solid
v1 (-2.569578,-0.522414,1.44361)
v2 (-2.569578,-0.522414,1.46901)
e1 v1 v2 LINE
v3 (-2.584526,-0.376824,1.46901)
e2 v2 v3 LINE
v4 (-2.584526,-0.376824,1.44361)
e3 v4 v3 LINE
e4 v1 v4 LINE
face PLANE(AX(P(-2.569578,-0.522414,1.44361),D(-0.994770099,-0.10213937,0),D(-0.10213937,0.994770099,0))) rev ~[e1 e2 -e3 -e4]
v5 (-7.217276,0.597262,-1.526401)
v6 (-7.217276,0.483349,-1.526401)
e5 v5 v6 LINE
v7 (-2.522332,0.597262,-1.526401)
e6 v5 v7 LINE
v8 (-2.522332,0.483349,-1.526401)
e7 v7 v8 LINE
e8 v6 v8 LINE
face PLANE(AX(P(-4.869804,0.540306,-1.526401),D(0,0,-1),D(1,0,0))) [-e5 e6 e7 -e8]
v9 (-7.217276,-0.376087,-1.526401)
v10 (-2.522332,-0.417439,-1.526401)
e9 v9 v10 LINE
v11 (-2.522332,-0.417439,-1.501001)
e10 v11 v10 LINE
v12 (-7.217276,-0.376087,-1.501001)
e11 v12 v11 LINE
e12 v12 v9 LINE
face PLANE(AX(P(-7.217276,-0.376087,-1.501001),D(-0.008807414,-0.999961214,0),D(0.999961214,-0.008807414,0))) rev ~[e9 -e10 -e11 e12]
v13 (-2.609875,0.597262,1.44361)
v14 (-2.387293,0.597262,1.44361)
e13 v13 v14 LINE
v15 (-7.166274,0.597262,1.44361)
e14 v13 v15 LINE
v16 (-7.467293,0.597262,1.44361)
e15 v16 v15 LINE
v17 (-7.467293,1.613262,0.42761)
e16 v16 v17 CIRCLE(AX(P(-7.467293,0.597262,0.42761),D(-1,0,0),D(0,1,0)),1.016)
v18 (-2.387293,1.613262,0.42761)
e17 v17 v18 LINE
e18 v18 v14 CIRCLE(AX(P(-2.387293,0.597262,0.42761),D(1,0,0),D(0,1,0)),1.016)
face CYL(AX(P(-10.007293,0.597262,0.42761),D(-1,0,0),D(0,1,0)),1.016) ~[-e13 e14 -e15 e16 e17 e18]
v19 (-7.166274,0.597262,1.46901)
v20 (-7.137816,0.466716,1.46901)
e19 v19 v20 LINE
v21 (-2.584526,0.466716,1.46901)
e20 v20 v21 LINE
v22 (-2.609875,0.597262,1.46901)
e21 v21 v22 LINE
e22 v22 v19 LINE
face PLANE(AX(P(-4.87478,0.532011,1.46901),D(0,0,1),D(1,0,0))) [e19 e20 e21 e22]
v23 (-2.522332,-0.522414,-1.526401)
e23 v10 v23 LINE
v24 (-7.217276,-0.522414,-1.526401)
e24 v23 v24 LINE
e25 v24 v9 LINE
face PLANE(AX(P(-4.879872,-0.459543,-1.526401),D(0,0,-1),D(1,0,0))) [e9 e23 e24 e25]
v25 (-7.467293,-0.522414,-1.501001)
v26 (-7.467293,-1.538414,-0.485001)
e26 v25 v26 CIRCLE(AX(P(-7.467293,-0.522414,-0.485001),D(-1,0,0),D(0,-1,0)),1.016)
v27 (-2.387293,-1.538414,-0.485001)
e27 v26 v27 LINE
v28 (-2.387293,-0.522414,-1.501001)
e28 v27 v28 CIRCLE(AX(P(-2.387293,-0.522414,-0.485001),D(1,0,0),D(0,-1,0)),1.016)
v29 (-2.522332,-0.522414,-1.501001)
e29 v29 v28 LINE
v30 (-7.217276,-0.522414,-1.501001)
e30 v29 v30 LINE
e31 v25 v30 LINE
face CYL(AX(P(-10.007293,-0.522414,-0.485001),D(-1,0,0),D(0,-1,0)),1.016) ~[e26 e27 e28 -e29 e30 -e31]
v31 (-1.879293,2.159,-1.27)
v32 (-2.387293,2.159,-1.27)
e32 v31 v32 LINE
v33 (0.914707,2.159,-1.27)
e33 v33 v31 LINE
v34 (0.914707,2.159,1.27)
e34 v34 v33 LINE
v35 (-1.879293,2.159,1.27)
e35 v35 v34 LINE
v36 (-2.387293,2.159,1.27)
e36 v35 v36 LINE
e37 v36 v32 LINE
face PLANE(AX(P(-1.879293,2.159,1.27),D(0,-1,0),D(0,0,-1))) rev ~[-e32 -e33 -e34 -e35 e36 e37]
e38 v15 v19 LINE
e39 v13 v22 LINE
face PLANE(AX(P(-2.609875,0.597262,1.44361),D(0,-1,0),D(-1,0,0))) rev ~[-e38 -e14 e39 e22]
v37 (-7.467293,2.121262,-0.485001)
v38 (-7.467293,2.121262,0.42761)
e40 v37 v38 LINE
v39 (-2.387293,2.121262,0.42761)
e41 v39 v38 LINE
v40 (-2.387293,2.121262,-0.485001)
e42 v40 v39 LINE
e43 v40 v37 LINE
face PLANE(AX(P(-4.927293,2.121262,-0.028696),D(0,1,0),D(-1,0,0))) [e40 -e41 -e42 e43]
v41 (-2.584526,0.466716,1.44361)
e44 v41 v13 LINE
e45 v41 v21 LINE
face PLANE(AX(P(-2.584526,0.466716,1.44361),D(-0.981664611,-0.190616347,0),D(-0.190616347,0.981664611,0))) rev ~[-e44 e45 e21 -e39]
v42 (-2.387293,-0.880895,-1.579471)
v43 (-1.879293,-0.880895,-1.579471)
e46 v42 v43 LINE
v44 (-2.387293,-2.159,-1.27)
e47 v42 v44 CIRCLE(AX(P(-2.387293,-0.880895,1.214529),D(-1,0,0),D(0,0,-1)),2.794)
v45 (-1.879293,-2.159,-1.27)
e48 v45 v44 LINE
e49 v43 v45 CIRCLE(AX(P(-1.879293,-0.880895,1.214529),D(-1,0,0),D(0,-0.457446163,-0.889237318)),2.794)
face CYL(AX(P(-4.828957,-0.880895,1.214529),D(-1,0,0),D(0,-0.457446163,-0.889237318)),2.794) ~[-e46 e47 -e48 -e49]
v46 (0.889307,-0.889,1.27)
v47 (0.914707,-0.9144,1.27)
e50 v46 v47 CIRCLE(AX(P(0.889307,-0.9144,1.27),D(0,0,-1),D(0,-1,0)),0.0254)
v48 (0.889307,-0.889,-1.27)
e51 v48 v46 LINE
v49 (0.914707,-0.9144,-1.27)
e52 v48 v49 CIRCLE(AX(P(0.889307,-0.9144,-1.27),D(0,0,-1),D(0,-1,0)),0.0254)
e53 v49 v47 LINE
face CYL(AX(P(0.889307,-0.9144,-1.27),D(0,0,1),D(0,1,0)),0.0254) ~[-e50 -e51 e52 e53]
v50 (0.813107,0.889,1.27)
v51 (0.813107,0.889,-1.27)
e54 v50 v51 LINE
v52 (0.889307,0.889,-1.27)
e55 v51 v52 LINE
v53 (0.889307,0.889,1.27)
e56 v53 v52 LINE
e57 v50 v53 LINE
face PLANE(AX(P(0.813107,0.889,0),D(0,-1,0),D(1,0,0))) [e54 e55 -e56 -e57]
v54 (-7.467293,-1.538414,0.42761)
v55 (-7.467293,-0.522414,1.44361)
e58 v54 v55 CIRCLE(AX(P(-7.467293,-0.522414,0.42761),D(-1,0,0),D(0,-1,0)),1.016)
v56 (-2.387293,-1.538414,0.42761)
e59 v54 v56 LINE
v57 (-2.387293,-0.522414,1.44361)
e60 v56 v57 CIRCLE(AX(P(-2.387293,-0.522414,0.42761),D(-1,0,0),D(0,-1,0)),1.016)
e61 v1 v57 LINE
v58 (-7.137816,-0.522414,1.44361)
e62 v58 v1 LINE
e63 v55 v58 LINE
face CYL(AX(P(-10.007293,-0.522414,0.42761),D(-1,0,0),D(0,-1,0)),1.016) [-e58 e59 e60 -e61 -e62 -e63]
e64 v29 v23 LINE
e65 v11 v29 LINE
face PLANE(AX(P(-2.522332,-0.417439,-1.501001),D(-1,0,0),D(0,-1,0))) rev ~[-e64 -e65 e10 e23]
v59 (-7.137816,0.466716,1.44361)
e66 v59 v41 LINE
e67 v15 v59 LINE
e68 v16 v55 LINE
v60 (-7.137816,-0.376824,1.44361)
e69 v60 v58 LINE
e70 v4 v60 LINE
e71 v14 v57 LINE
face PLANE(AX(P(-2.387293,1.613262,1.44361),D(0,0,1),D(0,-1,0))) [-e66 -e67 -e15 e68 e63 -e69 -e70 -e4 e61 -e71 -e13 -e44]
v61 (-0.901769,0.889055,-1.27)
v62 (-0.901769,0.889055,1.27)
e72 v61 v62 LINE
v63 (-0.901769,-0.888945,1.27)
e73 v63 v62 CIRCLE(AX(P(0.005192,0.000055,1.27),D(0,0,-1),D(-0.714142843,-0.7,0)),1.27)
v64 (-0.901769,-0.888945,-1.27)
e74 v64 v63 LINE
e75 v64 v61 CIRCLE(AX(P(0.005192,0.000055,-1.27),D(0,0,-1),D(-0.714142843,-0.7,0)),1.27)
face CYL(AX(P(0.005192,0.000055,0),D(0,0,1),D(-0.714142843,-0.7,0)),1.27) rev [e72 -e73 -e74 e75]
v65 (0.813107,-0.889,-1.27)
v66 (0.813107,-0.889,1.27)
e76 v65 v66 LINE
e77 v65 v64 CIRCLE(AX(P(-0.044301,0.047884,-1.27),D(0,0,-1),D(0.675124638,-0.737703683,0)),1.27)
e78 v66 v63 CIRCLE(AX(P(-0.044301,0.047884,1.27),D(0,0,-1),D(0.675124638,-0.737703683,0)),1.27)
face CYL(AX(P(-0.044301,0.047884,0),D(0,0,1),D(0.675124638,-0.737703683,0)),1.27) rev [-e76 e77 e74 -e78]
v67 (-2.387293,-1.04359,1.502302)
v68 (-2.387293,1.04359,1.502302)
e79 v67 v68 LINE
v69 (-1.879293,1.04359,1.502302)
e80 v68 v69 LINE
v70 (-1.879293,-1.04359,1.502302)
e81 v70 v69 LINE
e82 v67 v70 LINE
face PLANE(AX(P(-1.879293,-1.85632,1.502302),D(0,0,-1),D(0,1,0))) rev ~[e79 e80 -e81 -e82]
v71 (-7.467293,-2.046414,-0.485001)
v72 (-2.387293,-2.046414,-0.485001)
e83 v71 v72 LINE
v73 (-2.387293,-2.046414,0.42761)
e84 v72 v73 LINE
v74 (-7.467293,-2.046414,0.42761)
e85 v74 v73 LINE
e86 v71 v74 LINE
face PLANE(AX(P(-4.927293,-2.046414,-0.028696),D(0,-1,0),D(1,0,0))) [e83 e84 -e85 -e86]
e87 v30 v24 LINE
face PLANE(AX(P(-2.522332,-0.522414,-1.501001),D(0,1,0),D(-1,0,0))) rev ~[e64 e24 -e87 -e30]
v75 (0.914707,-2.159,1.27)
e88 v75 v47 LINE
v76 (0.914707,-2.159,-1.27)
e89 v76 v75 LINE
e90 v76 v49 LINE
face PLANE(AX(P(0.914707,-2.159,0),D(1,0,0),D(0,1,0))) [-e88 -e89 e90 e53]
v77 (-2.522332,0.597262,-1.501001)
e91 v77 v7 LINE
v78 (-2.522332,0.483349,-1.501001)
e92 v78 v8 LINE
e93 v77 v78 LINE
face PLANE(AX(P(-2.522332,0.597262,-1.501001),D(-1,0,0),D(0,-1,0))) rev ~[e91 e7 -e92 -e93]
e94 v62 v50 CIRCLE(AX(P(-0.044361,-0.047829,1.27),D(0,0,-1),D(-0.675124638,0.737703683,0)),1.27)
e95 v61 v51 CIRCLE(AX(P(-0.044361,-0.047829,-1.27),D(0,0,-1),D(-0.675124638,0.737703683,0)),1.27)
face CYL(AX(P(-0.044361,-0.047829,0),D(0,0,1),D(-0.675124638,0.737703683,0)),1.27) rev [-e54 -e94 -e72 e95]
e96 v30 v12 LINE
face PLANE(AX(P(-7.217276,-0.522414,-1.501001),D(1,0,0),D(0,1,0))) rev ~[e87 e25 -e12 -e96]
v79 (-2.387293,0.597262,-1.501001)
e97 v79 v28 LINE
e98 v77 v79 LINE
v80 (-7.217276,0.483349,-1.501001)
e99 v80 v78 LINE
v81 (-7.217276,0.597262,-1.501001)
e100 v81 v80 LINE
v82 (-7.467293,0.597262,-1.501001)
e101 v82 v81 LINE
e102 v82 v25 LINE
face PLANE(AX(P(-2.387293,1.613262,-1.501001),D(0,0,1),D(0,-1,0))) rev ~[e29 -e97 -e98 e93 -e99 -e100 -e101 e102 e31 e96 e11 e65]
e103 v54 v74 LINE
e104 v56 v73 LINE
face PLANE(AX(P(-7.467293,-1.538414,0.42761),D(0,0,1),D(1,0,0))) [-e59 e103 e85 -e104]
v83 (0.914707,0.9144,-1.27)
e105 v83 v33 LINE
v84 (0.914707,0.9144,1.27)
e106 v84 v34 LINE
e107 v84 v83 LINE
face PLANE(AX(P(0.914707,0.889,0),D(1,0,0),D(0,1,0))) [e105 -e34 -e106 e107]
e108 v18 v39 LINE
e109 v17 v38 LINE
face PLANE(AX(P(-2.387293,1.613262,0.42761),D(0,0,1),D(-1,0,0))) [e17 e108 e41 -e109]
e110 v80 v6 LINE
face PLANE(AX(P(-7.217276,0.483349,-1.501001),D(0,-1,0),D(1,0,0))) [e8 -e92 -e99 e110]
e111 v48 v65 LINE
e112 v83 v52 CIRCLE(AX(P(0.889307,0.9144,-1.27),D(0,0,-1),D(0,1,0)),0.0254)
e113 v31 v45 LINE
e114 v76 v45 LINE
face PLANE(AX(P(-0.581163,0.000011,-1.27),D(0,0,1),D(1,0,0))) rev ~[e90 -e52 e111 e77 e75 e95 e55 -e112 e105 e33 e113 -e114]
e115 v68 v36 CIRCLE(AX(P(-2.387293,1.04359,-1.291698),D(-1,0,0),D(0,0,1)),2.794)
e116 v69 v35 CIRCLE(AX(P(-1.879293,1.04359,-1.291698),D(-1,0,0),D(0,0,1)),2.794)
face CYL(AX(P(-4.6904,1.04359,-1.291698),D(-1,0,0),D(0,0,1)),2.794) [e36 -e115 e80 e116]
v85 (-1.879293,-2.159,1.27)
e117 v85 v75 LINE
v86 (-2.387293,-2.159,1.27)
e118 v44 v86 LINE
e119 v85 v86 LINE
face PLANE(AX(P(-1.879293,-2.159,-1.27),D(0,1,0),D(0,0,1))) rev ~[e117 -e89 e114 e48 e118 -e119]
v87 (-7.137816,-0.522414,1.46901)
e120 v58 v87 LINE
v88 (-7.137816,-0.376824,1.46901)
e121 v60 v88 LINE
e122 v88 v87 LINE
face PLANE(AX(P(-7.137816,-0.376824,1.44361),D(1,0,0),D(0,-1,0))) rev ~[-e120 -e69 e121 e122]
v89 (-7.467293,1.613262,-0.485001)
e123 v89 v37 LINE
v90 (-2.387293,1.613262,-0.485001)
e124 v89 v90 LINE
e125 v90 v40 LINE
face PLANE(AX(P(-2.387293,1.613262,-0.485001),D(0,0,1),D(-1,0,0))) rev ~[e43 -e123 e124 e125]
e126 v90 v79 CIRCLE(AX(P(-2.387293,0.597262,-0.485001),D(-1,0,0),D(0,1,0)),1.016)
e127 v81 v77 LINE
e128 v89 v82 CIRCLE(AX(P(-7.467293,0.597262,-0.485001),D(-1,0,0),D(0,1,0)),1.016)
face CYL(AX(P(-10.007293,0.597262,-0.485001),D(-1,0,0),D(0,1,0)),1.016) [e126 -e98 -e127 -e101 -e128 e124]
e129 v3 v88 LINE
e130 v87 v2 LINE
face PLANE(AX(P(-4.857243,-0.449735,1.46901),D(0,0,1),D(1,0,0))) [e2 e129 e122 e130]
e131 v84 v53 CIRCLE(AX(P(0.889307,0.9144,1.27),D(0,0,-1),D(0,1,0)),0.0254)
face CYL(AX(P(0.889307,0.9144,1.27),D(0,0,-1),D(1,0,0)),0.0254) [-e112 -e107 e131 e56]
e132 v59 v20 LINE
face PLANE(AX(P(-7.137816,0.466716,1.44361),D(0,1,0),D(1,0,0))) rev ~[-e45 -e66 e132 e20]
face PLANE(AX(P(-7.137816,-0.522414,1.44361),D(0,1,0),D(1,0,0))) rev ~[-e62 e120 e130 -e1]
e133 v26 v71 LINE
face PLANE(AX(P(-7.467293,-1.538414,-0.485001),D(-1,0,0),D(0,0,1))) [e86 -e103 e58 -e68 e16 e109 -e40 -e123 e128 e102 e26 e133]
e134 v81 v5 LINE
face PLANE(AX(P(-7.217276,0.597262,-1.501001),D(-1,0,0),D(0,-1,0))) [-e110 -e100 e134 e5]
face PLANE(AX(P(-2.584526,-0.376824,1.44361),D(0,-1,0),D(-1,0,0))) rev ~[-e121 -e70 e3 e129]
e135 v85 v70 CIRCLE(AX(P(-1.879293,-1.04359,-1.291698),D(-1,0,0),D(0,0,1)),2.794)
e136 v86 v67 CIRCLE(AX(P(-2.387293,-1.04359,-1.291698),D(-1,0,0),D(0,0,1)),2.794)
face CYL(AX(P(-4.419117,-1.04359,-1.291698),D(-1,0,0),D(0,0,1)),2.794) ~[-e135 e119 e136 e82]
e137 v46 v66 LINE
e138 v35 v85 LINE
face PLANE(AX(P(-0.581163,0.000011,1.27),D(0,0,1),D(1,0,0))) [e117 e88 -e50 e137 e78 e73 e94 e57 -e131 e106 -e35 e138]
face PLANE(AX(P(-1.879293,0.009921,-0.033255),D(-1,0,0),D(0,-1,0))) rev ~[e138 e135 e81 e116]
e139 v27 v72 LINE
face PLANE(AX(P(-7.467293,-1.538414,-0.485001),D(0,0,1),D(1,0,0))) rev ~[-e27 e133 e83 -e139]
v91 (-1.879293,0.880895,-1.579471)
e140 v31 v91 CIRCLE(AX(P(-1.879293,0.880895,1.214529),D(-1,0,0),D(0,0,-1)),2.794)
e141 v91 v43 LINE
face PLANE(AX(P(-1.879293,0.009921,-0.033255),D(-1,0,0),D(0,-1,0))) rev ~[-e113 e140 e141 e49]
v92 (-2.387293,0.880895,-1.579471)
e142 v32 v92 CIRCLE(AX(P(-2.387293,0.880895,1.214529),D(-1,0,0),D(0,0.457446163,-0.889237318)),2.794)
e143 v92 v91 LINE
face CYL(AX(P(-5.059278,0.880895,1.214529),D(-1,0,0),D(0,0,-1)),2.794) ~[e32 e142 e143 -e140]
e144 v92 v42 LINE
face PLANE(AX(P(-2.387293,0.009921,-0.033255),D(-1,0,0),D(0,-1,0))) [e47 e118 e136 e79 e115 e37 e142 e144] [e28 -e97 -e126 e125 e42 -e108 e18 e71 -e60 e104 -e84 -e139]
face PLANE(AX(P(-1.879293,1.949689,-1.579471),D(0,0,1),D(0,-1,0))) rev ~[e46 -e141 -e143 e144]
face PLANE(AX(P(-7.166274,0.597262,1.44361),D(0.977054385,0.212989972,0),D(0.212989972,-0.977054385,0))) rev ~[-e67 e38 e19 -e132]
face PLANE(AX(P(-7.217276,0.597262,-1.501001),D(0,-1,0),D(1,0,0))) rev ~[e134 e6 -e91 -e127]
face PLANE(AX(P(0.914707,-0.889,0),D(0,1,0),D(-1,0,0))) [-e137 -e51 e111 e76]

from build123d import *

# Parameters (mm, degrees)
F1_DEPTH    = 1.27
F2_R        = 0.0254
F4_DEPTH    = 0.508
F5_T1_DEPTH = 5.1142141328
F5_T3_DEPTH = 4.5716483018
F5_T5_DEPTH = 5.8519702279
F5_T7_DEPTH = 5.3913281872
F6_W        = 3.1516760678
F6_H        = 2.9446112536
F7_DEPTH    = 5.08
F8_T1_DEPTH = 7.62
F10_DEPTH   = 0.0254
F11_W       = 4.6949440148
F11_H       = 0.1139125334
F12_DEPTH   = 0.0254
F13_W       = 5.08
F13_H       = 0.9126112536
F14_DEPTH   = 0.508
F15_W       = 5.08
F15_H       = 0.9126112536
F16_DEPTH   = 0.508


# Not quite as in the source:
# - a fillet or chamfer that OpenCascade refuses, or shapes differently, is made with other operations: its cross-section is extruded or revolved along the edge and cut away or added


with BuildPart() as f1:
    # F0 (on Top) → F1 (new body, symmetric)
    with BuildSketch(Plane.XY):
        with BuildLine():
            Line((0.914706802, 2.159), (-1.879293198, 2.159))
            Line((-1.879293198, 2.159), (-1.879293198, -2.159))
            Line((-1.879293198, -2.159), (0.914706802, -2.159))
            Line((0.914706802, -2.159), (0.914706802, -0.889))
            Line((0.914706802, -0.889), (0.863906802, -0.889))
            Line((0.863906802, -0.889), (0.813106802, -0.889))
            ThreePointArc((0.813106802, -0.889), (-0.0443418563, -1.2221163224), (-0.901769336, -0.8889454908))
            ThreePointArc((-0.901769336, -0.8889454908), (-1.2648079256, 5.45092e-05), (-0.901769336, 0.8890545092))
            ThreePointArc((-0.901769336, 0.8890545092), (-0.0443206777, 1.2221708316), (0.813106802, 0.889))
            Line((0.813106802, 0.889), (0.863906802, 0.889))
            Line((0.863906802, 0.889), (0.914706802, 0.889))
            Line((0.914706802, 0.889), (0.914706802, 2.159))
        make_face()
    extrude(amount=F1_DEPTH, both=True)

    # F2
    f2_edges = [f1.edges().sort_by_distance(p)[0] for p in [
        (0.914707, 0.889, 0),
        (0.914707, -0.889, 0),
    ]]
    fillet(f2_edges, radius=F2_R)

    # F3 (on face) → F4 (join)
    with BuildSketch(Plane(origin=(-1.879293198, 0, 0), x_dir=(0, -1, 0), z_dir=(-1, 0, 0))):
        Polygon((-1.9648331217, 1.5023018932), (-2.159, 1.27), (-2.159, -1.27), (-1.9496894674, -1.5794709325), (1.8575610593, -1.5794709325), (2.159, -1.27), (2.159, 1.27), (1.8563199556, 1.5023018932), align=None)
    extrude(amount=F4_DEPTH)

    # F5: fillet of radius 2.794 on 4 edges, made by hand

    # F5_s2 → F5_t1 (cut)
    with BuildSketch(Plane.YZ.offset(-4.6904002644)):
        with BuildLine():
            ThreePointArc((1.0435902952, 1.5023018932), (1.6132619065, 1.4436099664), (2.159, 1.27))
            Line((2.159, 1.27), (1.9648331217, 1.5023018932))
            Line((1.9648331217, 1.5023018932), (1.0435902952, 1.5023018932))
        make_face()
    extrude(amount=F5_T1_DEPTH, mode=Mode.SUBTRACT)

    # F5_s4 → F5_t3 (cut)
    with BuildSketch(Plane.YZ.offset(-4.4191173489)):
        with BuildLine():
            ThreePointArc((-1.0435902952, 1.5023018932), (-1.6132619065, 1.4436099664), (-2.159, 1.27))
            Line((-2.159, 1.27), (-1.8563199556, 1.5023018932))
            Line((-1.8563199556, 1.5023018932), (-1.0435902952, 1.5023018932))
        make_face()
    extrude(amount=F5_T3_DEPTH, mode=Mode.SUBTRACT)

    # F5_s6 → F5_t5 (cut)
    with BuildSketch(Plane.YZ.offset(-5.0592783119)):
        with BuildLine():
            ThreePointArc((0.8808954219, -1.5794709325), (1.5384141613, -1.5010012872), (2.159, -1.27))
            Line((2.159, -1.27), (1.9496894674, -1.5794709325))
            Line((1.9496894674, -1.5794709325), (0.8808954219, -1.5794709325))
        make_face()
    extrude(amount=F5_T5_DEPTH, mode=Mode.SUBTRACT)

    # F5_s8 → F5_t7 (cut)
    with BuildSketch(Plane.YZ.offset(-4.8289572916)):
        with BuildLine():
            ThreePointArc((-2.159, -1.27), (-1.5384141613, -1.5010012872), (-0.8808954219, -1.5794709325))
            Line((-0.8808954219, -1.5794709325), (-1.8575610593, -1.5794709325))
            Line((-1.8575610593, -1.5794709325), (-2.159, -1.27))
        make_face()
    extrude(amount=F5_T7_DEPTH, mode=Mode.SUBTRACT)

    # F6 (on face) → F7 (join)
    with BuildSketch(Plane(origin=(-2.387293198, 0, 0), x_dir=(0, -1, 0), z_dir=(-1, 0, 0))):
        with Locations((-0.0374238726, -0.0286956604)):
            Rectangle(F6_W, F6_H)
    extrude(amount=F7_DEPTH)

    # F8: fillet of radius 1.016 on 4 edges, made by hand

    # F8_s2 → F8_t1 (cut)
    with BuildSketch(Plane.YZ.offset(-10.007293198)):
        with BuildLine():
            ThreePointArc((1.6132619065, 0.4276099664), (1.3156823962, 1.1460304561), (0.5972619065, 1.4436099664))
            Line((0.5972619065, 1.4436099664), (1.6132619065, 1.4436099664))
            Line((1.6132619065, 1.4436099664), (1.6132619065, 0.4276099664))
        make_face()
        with BuildLine():
            ThreePointArc((-1.5384141613, 0.4276099664), (-1.240834651, 1.1460304561), (-0.5224141613, 1.4436099664))
            Line((-0.5224141613, 1.4436099664), (-1.5384141613, 1.4436099664))
            Line((-1.5384141613, 1.4436099664), (-1.5384141613, 0.4276099664))
        make_face()
        with BuildLine():
            ThreePointArc((1.6132619065, -0.4850012872), (1.3156823962, -1.2034217769), (0.5972619065, -1.5010012872))
            Line((0.5972619065, -1.5010012872), (1.6132619065, -1.5010012872))
            Line((1.6132619065, -1.5010012872), (1.6132619065, -0.4850012872))
        make_face()
        with BuildLine():
            ThreePointArc((-1.5384141613, -0.4850012872), (-1.240834651, -1.2034217769), (-0.5224141613, -1.5010012872))
            Line((-0.5224141613, -1.5010012872), (-1.5384141613, -1.5010012872))
            Line((-1.5384141613, -1.5010012872), (-1.5384141613, -0.4850012872))
        make_face()
    extrude(amount=F8_T1_DEPTH, mode=Mode.SUBTRACT)

    # F9 (on face) → F10 (join)
    with BuildSketch(Plane.XY.offset(1.4436099664)):
        Polygon((-7.1662743576, 0.5972619065), (-7.1378163993, 0.466715981), (-2.5845263153, 0.466715981), (-2.609875286, 0.5972619065), align=None)
        Polygon((-2.5695776567, -0.5224141613), (-2.5845263153, -0.3768240858), (-7.1378163993, -0.3768240858), (-7.1378163993, -0.5224141613), align=None)
    extrude(amount=F10_DEPTH)

    # F11 (on face) → F12 (join)
    with BuildSketch(Plane(origin=(0, 0, -1.5010012872), x_dir=(1, 0, 0), z_dir=(0, 0, -1))):
        Polygon((-7.2172759101, 0.376087494), (-2.5223318953, 0.4174394126), (-2.5223318953, 0.5224141613), (-7.2172759101, 0.5224141613), align=None)
        with Locations((-4.8698039027, -0.5403056398)):
            Rectangle(F11_W, F11_H)
    extrude(amount=F12_DEPTH)

    # F13 (on face) → F14 (join)
    with BuildSketch(Plane(origin=(0, 1.6132619065, 0), x_dir=(-1, 0, 0), z_dir=(0, 1, 0))):
        with Locations((4.927293198, -0.0286956604)):
            Rectangle(F13_W, F13_H)
    extrude(amount=F14_DEPTH)

    # F15 (on face) → F16 (join)
    with BuildSketch(Plane.XZ.offset(1.5384141613)):
        with Locations((-4.927293198, -0.0286956604)):
            Rectangle(F15_W, F15_H)
    extrude(amount=F16_DEPTH)


solid = f1.part
